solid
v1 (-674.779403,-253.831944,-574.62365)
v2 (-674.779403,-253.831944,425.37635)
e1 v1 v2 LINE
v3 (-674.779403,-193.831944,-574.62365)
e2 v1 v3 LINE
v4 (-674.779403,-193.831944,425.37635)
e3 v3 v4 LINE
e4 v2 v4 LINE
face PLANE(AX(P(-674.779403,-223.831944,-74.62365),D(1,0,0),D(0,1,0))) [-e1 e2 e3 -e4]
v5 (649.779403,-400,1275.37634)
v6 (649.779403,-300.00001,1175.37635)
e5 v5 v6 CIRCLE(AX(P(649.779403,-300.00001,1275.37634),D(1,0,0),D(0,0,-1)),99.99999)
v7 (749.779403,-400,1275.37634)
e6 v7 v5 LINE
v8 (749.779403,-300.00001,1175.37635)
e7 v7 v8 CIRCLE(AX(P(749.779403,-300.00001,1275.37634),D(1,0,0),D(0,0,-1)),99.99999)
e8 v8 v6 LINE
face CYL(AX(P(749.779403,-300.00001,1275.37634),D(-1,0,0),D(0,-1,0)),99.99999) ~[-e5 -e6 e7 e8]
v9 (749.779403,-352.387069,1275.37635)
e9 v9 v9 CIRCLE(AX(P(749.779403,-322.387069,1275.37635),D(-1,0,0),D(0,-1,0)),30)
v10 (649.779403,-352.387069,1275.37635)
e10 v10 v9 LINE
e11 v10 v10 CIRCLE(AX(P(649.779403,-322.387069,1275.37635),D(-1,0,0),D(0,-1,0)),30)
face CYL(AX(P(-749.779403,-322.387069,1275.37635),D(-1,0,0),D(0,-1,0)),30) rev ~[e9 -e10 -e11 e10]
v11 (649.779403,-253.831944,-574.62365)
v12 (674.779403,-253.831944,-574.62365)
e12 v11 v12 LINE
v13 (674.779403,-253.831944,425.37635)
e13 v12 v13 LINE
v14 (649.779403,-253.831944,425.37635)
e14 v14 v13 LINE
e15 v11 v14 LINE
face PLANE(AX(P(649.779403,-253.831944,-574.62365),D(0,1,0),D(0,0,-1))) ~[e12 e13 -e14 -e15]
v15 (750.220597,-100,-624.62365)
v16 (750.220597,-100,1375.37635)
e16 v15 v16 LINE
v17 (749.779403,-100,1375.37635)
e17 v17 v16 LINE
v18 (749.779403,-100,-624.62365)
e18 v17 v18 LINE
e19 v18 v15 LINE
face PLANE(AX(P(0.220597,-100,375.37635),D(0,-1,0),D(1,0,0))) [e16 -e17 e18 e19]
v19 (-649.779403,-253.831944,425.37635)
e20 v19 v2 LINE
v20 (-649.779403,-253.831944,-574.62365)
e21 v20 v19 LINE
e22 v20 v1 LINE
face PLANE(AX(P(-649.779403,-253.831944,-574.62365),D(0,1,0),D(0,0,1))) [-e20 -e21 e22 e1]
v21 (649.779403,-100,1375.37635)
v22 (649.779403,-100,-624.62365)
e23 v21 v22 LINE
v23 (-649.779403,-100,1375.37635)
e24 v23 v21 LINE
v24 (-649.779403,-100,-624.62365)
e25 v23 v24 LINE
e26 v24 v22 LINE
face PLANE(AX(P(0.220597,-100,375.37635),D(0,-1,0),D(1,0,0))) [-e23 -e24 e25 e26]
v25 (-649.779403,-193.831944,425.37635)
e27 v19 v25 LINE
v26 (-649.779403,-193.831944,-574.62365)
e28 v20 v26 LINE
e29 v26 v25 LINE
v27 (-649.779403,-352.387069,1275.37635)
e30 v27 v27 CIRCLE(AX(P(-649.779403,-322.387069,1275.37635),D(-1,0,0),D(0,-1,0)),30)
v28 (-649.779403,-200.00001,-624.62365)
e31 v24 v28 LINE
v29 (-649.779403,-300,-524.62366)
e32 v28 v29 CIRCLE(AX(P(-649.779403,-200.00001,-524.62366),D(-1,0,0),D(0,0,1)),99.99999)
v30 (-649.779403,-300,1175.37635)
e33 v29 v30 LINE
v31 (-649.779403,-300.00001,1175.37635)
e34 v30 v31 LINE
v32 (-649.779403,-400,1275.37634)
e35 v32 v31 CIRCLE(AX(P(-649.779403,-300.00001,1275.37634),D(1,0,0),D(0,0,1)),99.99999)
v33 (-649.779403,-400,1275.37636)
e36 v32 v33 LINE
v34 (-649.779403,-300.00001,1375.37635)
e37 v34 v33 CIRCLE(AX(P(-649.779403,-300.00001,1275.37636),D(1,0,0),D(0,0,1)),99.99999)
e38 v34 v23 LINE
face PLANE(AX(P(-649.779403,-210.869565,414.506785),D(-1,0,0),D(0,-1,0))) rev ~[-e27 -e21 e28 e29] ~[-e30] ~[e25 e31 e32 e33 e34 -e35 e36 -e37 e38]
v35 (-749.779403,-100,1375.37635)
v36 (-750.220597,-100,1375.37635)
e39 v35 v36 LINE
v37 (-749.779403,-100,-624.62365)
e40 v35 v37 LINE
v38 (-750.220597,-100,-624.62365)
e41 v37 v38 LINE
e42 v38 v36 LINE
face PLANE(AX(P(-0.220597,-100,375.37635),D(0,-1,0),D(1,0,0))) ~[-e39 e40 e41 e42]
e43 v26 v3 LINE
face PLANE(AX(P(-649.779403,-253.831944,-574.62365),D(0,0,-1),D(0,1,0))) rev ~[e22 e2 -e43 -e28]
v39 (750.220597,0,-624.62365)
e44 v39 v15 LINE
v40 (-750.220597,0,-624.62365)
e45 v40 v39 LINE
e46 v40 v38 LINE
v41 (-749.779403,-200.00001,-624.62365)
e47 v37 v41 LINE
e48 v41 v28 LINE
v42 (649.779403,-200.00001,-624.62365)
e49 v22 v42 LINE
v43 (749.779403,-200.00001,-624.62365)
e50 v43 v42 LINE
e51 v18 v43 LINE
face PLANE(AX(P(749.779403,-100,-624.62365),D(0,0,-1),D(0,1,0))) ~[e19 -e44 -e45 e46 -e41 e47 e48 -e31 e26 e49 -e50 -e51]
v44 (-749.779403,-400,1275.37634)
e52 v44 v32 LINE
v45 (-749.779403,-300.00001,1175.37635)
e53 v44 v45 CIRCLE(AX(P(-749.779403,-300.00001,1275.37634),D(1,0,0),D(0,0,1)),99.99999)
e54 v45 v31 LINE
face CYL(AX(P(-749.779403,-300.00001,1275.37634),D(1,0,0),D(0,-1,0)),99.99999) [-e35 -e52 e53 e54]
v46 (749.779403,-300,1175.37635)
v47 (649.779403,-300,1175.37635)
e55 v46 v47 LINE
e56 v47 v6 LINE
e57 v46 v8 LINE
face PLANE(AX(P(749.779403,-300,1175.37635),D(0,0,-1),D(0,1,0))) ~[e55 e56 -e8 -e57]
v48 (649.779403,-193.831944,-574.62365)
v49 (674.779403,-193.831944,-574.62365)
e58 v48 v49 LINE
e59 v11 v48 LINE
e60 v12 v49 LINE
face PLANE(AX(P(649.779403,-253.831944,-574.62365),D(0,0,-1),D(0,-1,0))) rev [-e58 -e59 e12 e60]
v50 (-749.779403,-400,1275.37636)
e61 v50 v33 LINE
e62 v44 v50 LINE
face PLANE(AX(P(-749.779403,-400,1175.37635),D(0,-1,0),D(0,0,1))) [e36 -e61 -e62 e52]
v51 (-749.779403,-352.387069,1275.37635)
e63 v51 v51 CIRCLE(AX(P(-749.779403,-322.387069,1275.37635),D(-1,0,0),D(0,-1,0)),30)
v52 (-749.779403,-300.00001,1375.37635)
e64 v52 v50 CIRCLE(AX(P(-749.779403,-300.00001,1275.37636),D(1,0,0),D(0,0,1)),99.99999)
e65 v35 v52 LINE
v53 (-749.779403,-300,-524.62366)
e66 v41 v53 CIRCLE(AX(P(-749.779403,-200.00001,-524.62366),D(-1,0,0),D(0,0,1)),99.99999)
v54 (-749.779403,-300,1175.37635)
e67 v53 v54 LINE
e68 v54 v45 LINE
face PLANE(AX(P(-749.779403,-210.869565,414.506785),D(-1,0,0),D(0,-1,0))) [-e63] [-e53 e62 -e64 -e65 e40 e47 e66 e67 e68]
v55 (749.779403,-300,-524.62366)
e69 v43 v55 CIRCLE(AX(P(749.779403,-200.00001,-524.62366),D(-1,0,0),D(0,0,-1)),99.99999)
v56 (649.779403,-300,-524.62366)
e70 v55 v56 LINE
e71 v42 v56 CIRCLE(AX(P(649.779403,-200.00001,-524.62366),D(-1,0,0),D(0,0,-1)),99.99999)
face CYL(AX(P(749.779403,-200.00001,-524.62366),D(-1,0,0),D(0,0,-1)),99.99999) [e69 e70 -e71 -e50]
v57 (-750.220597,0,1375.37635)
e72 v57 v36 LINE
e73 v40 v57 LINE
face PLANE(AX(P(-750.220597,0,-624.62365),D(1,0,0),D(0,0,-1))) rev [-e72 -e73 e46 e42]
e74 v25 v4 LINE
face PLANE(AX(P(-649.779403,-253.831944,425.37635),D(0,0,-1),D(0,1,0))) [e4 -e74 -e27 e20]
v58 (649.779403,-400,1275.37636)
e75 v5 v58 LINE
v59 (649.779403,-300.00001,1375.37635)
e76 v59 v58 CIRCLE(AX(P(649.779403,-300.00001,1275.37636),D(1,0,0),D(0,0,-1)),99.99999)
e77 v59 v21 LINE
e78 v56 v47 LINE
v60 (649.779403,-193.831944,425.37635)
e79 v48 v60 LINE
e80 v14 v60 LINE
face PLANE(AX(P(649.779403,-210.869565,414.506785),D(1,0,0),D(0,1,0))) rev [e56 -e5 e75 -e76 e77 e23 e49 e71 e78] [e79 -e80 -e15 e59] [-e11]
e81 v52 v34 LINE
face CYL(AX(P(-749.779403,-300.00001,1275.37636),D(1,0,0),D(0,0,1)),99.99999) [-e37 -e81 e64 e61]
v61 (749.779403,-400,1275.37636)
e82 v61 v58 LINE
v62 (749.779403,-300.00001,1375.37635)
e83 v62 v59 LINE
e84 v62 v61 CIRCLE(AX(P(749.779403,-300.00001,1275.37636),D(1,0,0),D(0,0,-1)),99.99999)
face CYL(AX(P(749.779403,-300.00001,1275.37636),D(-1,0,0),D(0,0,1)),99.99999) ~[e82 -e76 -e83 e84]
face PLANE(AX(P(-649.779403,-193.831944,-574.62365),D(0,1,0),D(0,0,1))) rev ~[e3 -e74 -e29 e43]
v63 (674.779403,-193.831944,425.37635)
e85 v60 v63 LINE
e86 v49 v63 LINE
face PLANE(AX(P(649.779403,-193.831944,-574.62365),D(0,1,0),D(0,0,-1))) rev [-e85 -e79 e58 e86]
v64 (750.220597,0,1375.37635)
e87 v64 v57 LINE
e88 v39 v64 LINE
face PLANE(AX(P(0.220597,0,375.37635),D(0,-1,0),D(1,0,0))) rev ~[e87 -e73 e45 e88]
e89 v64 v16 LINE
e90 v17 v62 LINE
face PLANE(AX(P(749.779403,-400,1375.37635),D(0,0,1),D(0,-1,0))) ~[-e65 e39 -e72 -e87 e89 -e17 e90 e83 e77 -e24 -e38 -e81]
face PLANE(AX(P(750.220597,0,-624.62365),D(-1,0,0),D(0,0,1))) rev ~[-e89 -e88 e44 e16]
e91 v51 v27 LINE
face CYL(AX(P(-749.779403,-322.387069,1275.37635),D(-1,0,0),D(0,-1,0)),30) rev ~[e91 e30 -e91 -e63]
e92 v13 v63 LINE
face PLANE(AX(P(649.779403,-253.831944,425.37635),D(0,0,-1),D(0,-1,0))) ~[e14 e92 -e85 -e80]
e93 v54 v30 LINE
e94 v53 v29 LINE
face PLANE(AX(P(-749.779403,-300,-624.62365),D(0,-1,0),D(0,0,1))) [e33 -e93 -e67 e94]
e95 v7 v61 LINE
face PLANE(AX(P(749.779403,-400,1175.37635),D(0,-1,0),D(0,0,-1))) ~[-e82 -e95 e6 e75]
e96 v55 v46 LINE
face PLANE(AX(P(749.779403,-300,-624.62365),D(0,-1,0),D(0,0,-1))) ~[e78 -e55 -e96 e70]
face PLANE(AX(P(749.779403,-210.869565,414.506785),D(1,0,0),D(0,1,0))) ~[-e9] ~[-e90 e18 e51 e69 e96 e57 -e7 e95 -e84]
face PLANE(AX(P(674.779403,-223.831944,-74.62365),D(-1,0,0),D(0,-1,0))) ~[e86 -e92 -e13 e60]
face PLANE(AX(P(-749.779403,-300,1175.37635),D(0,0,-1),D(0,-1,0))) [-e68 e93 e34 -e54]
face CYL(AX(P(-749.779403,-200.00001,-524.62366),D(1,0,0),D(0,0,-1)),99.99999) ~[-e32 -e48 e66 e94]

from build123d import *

# Parameters (mm, degrees)
F0_W     = 1500
F0_H     = 2000
F1_DEPTH = 100
F3_DEPTH = 100
F4_W     = 60
F4_H     = 1000
F5_DEPTH = 25
F7_R     = 30
F8_DEPTH = 1500.001
F9_R     = 99.99999


# Not quite as in the source:
# - a fillet or chamfer is up to 0.001 mm smaller than in the source, because OpenCascade refuses the exact size


with BuildPart() as f1:
    # F0 (on Front) → F1 (new body)
    with BuildSketch(Plane.XZ):
        with Locations((0.2205967903, 375.376350426)):
            Rectangle(F0_W, F0_H)
    extrude(amount=F1_DEPTH)

    # F2 (on face) → F3 (join)
    with BuildSketch(Plane(origin=(-749.7794032097, 0, 0), x_dir=(0, -1, 0), z_dir=(-1, 0, 0))):
        Polygon((400, 1375.376350426), (100, 1375.376350426), (100, -624.623649574), (300, -624.623649574), (300, 1175.376350426), (400, 1175.376350426), align=None)
    extrude(amount=-F3_DEPTH)

    # F4 (on face) → F5 (cut)
    with BuildSketch(Plane.YZ.offset(-649.7794032097)):
        with Locations((-223.8319441676, -74.623649574)):
            Rectangle(F4_W, F4_H)
    extrude(amount=-F5_DEPTH, mode=Mode.SUBTRACT)

    # F6: F1 across plane


with BuildPart() as f1_1:
    add(f1.part)
    add(f1.part.mirror(Plane.YZ))

    # F7 (on face) → F8 (cut, through all)
    with BuildSketch(Plane(origin=(-749.7794032097, 0, 0), x_dir=(0, -1, 0), z_dir=(-1, 0, 0))):
        with Locations((322.3870694637, 1275.376350426)):
            Circle(F7_R)
    extrude(amount=-F8_DEPTH, mode=Mode.SUBTRACT)

    # F9 (radius 100 in the source; OpenCascade refuses exactly that, so slightly less here)
    f9_edges = [f1_1.edges().sort_by_distance(p)[0] for p in [
        (-699.779403, -400, 1175.37635),
        (699.779403, -400, 1175.37635),
        (-699.779403, -300, -624.62365),
        (699.779403, -300, -624.62365),
        (699.779403, -400, 1375.37635),
        (-699.779403, -400, 1375.37635),
    ]]
    fillet(f9_edges, radius=F9_R)


solid = f1_1.part
